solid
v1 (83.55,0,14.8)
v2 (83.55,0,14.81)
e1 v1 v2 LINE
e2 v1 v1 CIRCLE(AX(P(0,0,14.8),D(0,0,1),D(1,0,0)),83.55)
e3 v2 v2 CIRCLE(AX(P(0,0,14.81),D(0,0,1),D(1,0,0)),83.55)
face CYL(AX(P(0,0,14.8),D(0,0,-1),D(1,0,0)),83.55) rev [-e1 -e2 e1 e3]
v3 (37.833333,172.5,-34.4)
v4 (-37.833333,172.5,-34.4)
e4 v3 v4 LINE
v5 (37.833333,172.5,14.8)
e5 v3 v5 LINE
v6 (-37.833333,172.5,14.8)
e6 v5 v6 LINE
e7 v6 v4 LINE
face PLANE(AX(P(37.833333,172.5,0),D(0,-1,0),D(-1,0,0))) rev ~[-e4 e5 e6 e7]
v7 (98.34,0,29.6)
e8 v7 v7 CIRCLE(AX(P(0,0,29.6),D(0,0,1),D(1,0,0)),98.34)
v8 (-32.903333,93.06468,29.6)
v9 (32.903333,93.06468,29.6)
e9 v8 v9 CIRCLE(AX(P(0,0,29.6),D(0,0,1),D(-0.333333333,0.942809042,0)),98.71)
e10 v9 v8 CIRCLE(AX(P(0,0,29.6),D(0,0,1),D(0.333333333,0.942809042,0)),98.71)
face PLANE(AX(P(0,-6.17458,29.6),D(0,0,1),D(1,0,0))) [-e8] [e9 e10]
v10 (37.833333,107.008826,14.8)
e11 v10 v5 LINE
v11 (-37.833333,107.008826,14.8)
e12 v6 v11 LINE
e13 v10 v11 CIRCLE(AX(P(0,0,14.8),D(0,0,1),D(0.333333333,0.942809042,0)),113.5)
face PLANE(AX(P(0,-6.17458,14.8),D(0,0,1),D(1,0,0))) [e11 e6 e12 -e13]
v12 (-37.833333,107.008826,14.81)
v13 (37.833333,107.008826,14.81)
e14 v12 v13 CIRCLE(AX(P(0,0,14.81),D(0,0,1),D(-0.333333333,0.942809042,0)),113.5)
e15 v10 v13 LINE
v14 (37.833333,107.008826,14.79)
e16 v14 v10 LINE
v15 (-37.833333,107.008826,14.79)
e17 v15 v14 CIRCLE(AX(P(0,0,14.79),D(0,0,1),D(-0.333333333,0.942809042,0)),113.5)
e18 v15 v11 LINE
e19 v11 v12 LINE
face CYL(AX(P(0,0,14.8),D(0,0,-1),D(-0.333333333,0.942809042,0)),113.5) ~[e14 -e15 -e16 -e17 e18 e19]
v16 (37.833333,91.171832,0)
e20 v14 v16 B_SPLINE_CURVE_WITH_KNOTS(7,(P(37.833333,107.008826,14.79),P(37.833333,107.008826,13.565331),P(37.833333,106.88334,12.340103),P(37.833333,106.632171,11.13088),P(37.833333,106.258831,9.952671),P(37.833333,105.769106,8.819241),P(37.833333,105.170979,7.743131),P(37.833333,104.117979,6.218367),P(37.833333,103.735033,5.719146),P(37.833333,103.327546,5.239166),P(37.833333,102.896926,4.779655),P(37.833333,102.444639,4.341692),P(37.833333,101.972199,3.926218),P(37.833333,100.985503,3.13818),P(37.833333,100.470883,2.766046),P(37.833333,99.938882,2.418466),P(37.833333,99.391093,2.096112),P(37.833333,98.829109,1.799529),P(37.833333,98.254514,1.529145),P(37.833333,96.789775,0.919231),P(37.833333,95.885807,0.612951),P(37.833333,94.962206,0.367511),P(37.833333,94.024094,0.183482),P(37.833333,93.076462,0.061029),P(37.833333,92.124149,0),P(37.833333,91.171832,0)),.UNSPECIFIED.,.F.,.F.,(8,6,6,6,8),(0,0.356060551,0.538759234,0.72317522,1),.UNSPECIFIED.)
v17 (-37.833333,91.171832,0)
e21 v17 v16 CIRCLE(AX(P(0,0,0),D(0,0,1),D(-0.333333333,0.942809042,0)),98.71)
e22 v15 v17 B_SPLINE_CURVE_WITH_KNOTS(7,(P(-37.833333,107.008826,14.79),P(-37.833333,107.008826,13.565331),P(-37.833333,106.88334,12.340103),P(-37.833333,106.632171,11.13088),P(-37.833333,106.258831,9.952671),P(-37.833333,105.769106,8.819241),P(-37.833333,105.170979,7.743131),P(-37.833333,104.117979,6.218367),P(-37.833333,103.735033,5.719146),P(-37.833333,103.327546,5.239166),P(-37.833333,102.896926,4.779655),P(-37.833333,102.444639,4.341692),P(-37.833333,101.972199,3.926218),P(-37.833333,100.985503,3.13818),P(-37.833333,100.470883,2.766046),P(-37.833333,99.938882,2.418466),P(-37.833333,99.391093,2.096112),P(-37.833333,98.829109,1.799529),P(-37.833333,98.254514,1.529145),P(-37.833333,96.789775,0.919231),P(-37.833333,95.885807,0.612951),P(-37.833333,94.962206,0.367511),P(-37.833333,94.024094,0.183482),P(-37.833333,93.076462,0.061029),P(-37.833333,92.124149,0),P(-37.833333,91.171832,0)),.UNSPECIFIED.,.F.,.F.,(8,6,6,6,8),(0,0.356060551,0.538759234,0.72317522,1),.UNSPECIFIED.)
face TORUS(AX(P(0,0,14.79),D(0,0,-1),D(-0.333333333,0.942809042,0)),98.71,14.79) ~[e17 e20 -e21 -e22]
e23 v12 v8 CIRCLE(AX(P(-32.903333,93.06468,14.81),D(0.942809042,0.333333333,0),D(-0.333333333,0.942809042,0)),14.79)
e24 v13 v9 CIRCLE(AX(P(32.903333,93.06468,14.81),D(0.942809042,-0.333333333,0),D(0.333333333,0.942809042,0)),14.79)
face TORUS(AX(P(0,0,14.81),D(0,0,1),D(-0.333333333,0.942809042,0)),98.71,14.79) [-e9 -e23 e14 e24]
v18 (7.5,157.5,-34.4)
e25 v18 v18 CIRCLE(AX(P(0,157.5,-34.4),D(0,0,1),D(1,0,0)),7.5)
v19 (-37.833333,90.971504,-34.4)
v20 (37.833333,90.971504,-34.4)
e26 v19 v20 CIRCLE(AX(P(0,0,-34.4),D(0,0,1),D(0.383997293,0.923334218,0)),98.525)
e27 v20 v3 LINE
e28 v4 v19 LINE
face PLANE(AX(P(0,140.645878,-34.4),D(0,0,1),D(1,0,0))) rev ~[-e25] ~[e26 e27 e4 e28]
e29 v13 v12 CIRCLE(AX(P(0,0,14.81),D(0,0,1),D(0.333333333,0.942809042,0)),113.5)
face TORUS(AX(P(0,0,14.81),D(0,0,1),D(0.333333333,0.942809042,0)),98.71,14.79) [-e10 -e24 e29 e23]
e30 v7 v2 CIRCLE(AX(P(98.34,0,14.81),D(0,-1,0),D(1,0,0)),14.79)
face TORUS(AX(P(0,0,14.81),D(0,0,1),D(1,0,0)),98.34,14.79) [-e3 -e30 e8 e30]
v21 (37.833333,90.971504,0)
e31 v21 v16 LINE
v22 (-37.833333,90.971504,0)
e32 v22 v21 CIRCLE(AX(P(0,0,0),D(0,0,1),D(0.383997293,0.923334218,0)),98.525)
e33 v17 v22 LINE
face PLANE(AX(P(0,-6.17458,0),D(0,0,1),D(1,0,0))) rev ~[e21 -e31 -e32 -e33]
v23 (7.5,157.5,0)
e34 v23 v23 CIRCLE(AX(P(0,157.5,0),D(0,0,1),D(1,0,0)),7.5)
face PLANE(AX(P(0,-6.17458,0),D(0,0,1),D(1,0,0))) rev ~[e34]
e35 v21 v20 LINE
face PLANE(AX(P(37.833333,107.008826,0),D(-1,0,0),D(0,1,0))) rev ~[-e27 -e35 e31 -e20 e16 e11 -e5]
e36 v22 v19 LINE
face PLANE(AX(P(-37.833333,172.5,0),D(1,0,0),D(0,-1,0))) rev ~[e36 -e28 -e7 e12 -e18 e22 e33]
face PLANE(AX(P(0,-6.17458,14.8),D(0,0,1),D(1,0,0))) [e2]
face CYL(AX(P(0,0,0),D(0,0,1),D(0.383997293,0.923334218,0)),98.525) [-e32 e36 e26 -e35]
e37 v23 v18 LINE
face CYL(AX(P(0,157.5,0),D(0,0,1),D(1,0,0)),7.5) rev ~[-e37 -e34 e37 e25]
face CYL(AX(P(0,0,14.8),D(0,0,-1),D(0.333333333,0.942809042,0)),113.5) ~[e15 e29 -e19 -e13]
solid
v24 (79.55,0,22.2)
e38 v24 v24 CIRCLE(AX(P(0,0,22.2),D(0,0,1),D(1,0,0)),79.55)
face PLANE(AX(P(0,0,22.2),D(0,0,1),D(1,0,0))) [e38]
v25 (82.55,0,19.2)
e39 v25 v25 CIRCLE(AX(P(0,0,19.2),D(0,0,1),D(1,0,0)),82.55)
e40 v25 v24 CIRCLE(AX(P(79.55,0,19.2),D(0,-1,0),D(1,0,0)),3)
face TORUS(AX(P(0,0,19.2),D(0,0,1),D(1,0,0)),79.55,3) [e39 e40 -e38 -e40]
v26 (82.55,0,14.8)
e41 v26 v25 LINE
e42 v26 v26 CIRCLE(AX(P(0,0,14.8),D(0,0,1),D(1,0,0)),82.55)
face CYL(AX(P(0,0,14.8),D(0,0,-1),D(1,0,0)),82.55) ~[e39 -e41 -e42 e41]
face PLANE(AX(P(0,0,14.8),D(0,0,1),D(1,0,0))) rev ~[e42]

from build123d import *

# Parameters (mm, degrees)
F0_R     = 7.5
F0_R_2   = 83.55
F0_R_3   = 82.55
F3_DEPTH = 34.4
F4_DEPTH = 14.8
F5_START = 14.8
F5_DEPTH = 14.8
F6_R     = 14.79
F7_START = 14.8
F7_DEPTH = 7.4
F8_R     = 3


# Not quite as in the source:
# - a feature names something its author has since deleted; it is built from what else it names


with BuildPart() as f3:
    # F0 (on Top) → F3 (new body)
    with BuildSketch(Plane.XY):
        with BuildLine():
            ThreePointArc((-37.8333333333, 107.0088262196), (0, 113.5), (37.8333333333, 107.0088262196))
            Line((37.8333333333, 107.0088262196), (37.8333333333, 172.5))
            Line((37.8333333333, 172.5), (-37.8333333333, 172.5))
            Line((-37.8333333333, 172.5), (-37.8333333333, 107.0088262196))
        make_face()
        with Locations((0, 157.5)):
            Circle(F0_R, mode=Mode.SUBTRACT)
        with BuildLine():
            Line((37.8333333333, 90.9715038564), (37.8333333333, 107.0088262196))
            ThreePointArc((37.8333333333, 107.0088262196), (0, 113.5), (-37.8333333333, 107.0088262196))
            Line((-37.8333333333, 107.0088262196), (-37.8333333333, 90.9715038564))
            ThreePointArc((-37.8333333333, 90.9715038564), (0, 98.525), (37.8333333333, 90.9715038564))
        make_face()
        with BuildLine():
            ThreePointArc((98.525, 0), (81.9594558049, 54.6792760483), (37.8333333333, 90.9715038564))
            ThreePointArc((37.8333333333, 90.9715038564), (0, 98.525), (-37.8333333333, 90.9715038564))
            ThreePointArc((-37.8333333333, 90.9715038564), (-54.6792760483, -81.9594558049), (98.525, 0))
        make_face()
        Circle(F0_R_2, mode=Mode.SUBTRACT)
        Circle(F0_R_2)
        Circle(F0_R_3, mode=Mode.SUBTRACT)
        Circle(F0_R_3)
    extrude(amount=-F3_DEPTH)

    # F0 (on Top) → F4 (join)
    with BuildSketch(Plane.XY):
        with BuildLine():
            ThreePointArc((-37.8333333333, 107.0088262196), (-65.529255553, -92.6723619353), (113.5, 0))
            ThreePointArc((113.5, 0), (92.6723619353, 65.529255553), (37.8333333333, 107.0088262196))
            Line((37.8333333333, 107.0088262196), (37.8333333333, 90.9715038564))
            ThreePointArc((37.8333333333, 90.9715038564), (81.9594558049, 54.6792760483), (98.525, 0))
            ThreePointArc((98.525, 0), (-54.6792760483, -81.9594558049), (-37.8333333333, 90.9715038564))
            Line((-37.8333333333, 90.9715038564), (-37.8333333333, 107.0088262196))
        make_face()
        with BuildLine():
            ThreePointArc((98.525, 0), (81.9594558049, 54.6792760483), (37.8333333333, 90.9715038564))
            ThreePointArc((37.8333333333, 90.9715038564), (0, 98.525), (-37.8333333333, 90.9715038564))
            ThreePointArc((-37.8333333333, 90.9715038564), (-54.6792760483, -81.9594558049), (98.525, 0))
        make_face()
        Circle(F0_R_2, mode=Mode.SUBTRACT)
        Circle(F0_R_2)
        Circle(F0_R_3, mode=Mode.SUBTRACT)
        Circle(F0_R_3)
        with BuildLine():
            Line((37.8333333333, 90.9715038564), (37.8333333333, 107.0088262196))
            ThreePointArc((37.8333333333, 107.0088262196), (0, 113.5), (-37.8333333333, 107.0088262196))
            Line((-37.8333333333, 107.0088262196), (-37.8333333333, 90.9715038564))
            ThreePointArc((-37.8333333333, 90.9715038564), (0, 98.525), (37.8333333333, 90.9715038564))
        make_face()
        with BuildLine():
            ThreePointArc((-37.8333333333, 107.0088262196), (0, 113.5), (37.8333333333, 107.0088262196))
            Line((37.8333333333, 107.0088262196), (37.8333333333, 172.5))
            Line((37.8333333333, 172.5), (-37.8333333333, 172.5))
            Line((-37.8333333333, 172.5), (-37.8333333333, 107.0088262196))
        make_face()
        with Locations((0, 157.5)):
            Circle(F0_R, mode=Mode.SUBTRACT)
        with Locations((0, 157.5)):
            Circle(F0_R)
    extrude(amount=F4_DEPTH)

    # F0 (on Top) → F5 (join)
    with BuildSketch(Plane.XY.offset(F5_START)):
        with BuildLine():
            ThreePointArc((-37.8333333333, 107.0088262196), (-65.529255553, -92.6723619353), (113.5, 0))
            ThreePointArc((113.5, 0), (92.6723619353, 65.529255553), (37.8333333333, 107.0088262196))
            Line((37.8333333333, 107.0088262196), (37.8333333333, 90.9715038564))
            ThreePointArc((37.8333333333, 90.9715038564), (81.9594558049, 54.6792760483), (98.525, 0))
            ThreePointArc((98.525, 0), (-54.6792760483, -81.9594558049), (-37.8333333333, 90.9715038564))
            Line((-37.8333333333, 90.9715038564), (-37.8333333333, 107.0088262196))
        make_face()
        with BuildLine():
            ThreePointArc((98.525, 0), (81.9594558049, 54.6792760483), (37.8333333333, 90.9715038564))
            ThreePointArc((37.8333333333, 90.9715038564), (0, 98.525), (-37.8333333333, 90.9715038564))
            ThreePointArc((-37.8333333333, 90.9715038564), (-54.6792760483, -81.9594558049), (98.525, 0))
        make_face()
        Circle(F0_R_2, mode=Mode.SUBTRACT)
        with BuildLine():
            Line((37.8333333333, 90.9715038564), (37.8333333333, 107.0088262196))
            ThreePointArc((37.8333333333, 107.0088262196), (0, 113.5), (-37.8333333333, 107.0088262196))
            Line((-37.8333333333, 107.0088262196), (-37.8333333333, 90.9715038564))
            ThreePointArc((-37.8333333333, 90.9715038564), (0, 98.525), (37.8333333333, 90.9715038564))
        make_face()
    extrude(amount=F5_DEPTH)

    # F6
    f6_edges = [f3.edges().sort_by_distance(p)[0] for p in [
        (-37.833333, -107.008826, 29.6),
        (-83.55, 0, 29.6),
        (0, -113.5, 0),
    ]]
    fillet(f6_edges, radius=F6_R)


with BuildPart() as f7:
    # F0 (on Top) → F7 (new body)
    with BuildSketch(Plane.XY.offset(F7_START)):
        Circle(F0_R_3)
    extrude(amount=F7_DEPTH)

    # F8
    f8_edges = [f7.edges().sort_by_distance(p)[0] for p in [
        (-82.55, 0, 22.2),
    ]]
    fillet(f8_edges, radius=F8_R)


solid = Compound([f3.part, f7.part])
